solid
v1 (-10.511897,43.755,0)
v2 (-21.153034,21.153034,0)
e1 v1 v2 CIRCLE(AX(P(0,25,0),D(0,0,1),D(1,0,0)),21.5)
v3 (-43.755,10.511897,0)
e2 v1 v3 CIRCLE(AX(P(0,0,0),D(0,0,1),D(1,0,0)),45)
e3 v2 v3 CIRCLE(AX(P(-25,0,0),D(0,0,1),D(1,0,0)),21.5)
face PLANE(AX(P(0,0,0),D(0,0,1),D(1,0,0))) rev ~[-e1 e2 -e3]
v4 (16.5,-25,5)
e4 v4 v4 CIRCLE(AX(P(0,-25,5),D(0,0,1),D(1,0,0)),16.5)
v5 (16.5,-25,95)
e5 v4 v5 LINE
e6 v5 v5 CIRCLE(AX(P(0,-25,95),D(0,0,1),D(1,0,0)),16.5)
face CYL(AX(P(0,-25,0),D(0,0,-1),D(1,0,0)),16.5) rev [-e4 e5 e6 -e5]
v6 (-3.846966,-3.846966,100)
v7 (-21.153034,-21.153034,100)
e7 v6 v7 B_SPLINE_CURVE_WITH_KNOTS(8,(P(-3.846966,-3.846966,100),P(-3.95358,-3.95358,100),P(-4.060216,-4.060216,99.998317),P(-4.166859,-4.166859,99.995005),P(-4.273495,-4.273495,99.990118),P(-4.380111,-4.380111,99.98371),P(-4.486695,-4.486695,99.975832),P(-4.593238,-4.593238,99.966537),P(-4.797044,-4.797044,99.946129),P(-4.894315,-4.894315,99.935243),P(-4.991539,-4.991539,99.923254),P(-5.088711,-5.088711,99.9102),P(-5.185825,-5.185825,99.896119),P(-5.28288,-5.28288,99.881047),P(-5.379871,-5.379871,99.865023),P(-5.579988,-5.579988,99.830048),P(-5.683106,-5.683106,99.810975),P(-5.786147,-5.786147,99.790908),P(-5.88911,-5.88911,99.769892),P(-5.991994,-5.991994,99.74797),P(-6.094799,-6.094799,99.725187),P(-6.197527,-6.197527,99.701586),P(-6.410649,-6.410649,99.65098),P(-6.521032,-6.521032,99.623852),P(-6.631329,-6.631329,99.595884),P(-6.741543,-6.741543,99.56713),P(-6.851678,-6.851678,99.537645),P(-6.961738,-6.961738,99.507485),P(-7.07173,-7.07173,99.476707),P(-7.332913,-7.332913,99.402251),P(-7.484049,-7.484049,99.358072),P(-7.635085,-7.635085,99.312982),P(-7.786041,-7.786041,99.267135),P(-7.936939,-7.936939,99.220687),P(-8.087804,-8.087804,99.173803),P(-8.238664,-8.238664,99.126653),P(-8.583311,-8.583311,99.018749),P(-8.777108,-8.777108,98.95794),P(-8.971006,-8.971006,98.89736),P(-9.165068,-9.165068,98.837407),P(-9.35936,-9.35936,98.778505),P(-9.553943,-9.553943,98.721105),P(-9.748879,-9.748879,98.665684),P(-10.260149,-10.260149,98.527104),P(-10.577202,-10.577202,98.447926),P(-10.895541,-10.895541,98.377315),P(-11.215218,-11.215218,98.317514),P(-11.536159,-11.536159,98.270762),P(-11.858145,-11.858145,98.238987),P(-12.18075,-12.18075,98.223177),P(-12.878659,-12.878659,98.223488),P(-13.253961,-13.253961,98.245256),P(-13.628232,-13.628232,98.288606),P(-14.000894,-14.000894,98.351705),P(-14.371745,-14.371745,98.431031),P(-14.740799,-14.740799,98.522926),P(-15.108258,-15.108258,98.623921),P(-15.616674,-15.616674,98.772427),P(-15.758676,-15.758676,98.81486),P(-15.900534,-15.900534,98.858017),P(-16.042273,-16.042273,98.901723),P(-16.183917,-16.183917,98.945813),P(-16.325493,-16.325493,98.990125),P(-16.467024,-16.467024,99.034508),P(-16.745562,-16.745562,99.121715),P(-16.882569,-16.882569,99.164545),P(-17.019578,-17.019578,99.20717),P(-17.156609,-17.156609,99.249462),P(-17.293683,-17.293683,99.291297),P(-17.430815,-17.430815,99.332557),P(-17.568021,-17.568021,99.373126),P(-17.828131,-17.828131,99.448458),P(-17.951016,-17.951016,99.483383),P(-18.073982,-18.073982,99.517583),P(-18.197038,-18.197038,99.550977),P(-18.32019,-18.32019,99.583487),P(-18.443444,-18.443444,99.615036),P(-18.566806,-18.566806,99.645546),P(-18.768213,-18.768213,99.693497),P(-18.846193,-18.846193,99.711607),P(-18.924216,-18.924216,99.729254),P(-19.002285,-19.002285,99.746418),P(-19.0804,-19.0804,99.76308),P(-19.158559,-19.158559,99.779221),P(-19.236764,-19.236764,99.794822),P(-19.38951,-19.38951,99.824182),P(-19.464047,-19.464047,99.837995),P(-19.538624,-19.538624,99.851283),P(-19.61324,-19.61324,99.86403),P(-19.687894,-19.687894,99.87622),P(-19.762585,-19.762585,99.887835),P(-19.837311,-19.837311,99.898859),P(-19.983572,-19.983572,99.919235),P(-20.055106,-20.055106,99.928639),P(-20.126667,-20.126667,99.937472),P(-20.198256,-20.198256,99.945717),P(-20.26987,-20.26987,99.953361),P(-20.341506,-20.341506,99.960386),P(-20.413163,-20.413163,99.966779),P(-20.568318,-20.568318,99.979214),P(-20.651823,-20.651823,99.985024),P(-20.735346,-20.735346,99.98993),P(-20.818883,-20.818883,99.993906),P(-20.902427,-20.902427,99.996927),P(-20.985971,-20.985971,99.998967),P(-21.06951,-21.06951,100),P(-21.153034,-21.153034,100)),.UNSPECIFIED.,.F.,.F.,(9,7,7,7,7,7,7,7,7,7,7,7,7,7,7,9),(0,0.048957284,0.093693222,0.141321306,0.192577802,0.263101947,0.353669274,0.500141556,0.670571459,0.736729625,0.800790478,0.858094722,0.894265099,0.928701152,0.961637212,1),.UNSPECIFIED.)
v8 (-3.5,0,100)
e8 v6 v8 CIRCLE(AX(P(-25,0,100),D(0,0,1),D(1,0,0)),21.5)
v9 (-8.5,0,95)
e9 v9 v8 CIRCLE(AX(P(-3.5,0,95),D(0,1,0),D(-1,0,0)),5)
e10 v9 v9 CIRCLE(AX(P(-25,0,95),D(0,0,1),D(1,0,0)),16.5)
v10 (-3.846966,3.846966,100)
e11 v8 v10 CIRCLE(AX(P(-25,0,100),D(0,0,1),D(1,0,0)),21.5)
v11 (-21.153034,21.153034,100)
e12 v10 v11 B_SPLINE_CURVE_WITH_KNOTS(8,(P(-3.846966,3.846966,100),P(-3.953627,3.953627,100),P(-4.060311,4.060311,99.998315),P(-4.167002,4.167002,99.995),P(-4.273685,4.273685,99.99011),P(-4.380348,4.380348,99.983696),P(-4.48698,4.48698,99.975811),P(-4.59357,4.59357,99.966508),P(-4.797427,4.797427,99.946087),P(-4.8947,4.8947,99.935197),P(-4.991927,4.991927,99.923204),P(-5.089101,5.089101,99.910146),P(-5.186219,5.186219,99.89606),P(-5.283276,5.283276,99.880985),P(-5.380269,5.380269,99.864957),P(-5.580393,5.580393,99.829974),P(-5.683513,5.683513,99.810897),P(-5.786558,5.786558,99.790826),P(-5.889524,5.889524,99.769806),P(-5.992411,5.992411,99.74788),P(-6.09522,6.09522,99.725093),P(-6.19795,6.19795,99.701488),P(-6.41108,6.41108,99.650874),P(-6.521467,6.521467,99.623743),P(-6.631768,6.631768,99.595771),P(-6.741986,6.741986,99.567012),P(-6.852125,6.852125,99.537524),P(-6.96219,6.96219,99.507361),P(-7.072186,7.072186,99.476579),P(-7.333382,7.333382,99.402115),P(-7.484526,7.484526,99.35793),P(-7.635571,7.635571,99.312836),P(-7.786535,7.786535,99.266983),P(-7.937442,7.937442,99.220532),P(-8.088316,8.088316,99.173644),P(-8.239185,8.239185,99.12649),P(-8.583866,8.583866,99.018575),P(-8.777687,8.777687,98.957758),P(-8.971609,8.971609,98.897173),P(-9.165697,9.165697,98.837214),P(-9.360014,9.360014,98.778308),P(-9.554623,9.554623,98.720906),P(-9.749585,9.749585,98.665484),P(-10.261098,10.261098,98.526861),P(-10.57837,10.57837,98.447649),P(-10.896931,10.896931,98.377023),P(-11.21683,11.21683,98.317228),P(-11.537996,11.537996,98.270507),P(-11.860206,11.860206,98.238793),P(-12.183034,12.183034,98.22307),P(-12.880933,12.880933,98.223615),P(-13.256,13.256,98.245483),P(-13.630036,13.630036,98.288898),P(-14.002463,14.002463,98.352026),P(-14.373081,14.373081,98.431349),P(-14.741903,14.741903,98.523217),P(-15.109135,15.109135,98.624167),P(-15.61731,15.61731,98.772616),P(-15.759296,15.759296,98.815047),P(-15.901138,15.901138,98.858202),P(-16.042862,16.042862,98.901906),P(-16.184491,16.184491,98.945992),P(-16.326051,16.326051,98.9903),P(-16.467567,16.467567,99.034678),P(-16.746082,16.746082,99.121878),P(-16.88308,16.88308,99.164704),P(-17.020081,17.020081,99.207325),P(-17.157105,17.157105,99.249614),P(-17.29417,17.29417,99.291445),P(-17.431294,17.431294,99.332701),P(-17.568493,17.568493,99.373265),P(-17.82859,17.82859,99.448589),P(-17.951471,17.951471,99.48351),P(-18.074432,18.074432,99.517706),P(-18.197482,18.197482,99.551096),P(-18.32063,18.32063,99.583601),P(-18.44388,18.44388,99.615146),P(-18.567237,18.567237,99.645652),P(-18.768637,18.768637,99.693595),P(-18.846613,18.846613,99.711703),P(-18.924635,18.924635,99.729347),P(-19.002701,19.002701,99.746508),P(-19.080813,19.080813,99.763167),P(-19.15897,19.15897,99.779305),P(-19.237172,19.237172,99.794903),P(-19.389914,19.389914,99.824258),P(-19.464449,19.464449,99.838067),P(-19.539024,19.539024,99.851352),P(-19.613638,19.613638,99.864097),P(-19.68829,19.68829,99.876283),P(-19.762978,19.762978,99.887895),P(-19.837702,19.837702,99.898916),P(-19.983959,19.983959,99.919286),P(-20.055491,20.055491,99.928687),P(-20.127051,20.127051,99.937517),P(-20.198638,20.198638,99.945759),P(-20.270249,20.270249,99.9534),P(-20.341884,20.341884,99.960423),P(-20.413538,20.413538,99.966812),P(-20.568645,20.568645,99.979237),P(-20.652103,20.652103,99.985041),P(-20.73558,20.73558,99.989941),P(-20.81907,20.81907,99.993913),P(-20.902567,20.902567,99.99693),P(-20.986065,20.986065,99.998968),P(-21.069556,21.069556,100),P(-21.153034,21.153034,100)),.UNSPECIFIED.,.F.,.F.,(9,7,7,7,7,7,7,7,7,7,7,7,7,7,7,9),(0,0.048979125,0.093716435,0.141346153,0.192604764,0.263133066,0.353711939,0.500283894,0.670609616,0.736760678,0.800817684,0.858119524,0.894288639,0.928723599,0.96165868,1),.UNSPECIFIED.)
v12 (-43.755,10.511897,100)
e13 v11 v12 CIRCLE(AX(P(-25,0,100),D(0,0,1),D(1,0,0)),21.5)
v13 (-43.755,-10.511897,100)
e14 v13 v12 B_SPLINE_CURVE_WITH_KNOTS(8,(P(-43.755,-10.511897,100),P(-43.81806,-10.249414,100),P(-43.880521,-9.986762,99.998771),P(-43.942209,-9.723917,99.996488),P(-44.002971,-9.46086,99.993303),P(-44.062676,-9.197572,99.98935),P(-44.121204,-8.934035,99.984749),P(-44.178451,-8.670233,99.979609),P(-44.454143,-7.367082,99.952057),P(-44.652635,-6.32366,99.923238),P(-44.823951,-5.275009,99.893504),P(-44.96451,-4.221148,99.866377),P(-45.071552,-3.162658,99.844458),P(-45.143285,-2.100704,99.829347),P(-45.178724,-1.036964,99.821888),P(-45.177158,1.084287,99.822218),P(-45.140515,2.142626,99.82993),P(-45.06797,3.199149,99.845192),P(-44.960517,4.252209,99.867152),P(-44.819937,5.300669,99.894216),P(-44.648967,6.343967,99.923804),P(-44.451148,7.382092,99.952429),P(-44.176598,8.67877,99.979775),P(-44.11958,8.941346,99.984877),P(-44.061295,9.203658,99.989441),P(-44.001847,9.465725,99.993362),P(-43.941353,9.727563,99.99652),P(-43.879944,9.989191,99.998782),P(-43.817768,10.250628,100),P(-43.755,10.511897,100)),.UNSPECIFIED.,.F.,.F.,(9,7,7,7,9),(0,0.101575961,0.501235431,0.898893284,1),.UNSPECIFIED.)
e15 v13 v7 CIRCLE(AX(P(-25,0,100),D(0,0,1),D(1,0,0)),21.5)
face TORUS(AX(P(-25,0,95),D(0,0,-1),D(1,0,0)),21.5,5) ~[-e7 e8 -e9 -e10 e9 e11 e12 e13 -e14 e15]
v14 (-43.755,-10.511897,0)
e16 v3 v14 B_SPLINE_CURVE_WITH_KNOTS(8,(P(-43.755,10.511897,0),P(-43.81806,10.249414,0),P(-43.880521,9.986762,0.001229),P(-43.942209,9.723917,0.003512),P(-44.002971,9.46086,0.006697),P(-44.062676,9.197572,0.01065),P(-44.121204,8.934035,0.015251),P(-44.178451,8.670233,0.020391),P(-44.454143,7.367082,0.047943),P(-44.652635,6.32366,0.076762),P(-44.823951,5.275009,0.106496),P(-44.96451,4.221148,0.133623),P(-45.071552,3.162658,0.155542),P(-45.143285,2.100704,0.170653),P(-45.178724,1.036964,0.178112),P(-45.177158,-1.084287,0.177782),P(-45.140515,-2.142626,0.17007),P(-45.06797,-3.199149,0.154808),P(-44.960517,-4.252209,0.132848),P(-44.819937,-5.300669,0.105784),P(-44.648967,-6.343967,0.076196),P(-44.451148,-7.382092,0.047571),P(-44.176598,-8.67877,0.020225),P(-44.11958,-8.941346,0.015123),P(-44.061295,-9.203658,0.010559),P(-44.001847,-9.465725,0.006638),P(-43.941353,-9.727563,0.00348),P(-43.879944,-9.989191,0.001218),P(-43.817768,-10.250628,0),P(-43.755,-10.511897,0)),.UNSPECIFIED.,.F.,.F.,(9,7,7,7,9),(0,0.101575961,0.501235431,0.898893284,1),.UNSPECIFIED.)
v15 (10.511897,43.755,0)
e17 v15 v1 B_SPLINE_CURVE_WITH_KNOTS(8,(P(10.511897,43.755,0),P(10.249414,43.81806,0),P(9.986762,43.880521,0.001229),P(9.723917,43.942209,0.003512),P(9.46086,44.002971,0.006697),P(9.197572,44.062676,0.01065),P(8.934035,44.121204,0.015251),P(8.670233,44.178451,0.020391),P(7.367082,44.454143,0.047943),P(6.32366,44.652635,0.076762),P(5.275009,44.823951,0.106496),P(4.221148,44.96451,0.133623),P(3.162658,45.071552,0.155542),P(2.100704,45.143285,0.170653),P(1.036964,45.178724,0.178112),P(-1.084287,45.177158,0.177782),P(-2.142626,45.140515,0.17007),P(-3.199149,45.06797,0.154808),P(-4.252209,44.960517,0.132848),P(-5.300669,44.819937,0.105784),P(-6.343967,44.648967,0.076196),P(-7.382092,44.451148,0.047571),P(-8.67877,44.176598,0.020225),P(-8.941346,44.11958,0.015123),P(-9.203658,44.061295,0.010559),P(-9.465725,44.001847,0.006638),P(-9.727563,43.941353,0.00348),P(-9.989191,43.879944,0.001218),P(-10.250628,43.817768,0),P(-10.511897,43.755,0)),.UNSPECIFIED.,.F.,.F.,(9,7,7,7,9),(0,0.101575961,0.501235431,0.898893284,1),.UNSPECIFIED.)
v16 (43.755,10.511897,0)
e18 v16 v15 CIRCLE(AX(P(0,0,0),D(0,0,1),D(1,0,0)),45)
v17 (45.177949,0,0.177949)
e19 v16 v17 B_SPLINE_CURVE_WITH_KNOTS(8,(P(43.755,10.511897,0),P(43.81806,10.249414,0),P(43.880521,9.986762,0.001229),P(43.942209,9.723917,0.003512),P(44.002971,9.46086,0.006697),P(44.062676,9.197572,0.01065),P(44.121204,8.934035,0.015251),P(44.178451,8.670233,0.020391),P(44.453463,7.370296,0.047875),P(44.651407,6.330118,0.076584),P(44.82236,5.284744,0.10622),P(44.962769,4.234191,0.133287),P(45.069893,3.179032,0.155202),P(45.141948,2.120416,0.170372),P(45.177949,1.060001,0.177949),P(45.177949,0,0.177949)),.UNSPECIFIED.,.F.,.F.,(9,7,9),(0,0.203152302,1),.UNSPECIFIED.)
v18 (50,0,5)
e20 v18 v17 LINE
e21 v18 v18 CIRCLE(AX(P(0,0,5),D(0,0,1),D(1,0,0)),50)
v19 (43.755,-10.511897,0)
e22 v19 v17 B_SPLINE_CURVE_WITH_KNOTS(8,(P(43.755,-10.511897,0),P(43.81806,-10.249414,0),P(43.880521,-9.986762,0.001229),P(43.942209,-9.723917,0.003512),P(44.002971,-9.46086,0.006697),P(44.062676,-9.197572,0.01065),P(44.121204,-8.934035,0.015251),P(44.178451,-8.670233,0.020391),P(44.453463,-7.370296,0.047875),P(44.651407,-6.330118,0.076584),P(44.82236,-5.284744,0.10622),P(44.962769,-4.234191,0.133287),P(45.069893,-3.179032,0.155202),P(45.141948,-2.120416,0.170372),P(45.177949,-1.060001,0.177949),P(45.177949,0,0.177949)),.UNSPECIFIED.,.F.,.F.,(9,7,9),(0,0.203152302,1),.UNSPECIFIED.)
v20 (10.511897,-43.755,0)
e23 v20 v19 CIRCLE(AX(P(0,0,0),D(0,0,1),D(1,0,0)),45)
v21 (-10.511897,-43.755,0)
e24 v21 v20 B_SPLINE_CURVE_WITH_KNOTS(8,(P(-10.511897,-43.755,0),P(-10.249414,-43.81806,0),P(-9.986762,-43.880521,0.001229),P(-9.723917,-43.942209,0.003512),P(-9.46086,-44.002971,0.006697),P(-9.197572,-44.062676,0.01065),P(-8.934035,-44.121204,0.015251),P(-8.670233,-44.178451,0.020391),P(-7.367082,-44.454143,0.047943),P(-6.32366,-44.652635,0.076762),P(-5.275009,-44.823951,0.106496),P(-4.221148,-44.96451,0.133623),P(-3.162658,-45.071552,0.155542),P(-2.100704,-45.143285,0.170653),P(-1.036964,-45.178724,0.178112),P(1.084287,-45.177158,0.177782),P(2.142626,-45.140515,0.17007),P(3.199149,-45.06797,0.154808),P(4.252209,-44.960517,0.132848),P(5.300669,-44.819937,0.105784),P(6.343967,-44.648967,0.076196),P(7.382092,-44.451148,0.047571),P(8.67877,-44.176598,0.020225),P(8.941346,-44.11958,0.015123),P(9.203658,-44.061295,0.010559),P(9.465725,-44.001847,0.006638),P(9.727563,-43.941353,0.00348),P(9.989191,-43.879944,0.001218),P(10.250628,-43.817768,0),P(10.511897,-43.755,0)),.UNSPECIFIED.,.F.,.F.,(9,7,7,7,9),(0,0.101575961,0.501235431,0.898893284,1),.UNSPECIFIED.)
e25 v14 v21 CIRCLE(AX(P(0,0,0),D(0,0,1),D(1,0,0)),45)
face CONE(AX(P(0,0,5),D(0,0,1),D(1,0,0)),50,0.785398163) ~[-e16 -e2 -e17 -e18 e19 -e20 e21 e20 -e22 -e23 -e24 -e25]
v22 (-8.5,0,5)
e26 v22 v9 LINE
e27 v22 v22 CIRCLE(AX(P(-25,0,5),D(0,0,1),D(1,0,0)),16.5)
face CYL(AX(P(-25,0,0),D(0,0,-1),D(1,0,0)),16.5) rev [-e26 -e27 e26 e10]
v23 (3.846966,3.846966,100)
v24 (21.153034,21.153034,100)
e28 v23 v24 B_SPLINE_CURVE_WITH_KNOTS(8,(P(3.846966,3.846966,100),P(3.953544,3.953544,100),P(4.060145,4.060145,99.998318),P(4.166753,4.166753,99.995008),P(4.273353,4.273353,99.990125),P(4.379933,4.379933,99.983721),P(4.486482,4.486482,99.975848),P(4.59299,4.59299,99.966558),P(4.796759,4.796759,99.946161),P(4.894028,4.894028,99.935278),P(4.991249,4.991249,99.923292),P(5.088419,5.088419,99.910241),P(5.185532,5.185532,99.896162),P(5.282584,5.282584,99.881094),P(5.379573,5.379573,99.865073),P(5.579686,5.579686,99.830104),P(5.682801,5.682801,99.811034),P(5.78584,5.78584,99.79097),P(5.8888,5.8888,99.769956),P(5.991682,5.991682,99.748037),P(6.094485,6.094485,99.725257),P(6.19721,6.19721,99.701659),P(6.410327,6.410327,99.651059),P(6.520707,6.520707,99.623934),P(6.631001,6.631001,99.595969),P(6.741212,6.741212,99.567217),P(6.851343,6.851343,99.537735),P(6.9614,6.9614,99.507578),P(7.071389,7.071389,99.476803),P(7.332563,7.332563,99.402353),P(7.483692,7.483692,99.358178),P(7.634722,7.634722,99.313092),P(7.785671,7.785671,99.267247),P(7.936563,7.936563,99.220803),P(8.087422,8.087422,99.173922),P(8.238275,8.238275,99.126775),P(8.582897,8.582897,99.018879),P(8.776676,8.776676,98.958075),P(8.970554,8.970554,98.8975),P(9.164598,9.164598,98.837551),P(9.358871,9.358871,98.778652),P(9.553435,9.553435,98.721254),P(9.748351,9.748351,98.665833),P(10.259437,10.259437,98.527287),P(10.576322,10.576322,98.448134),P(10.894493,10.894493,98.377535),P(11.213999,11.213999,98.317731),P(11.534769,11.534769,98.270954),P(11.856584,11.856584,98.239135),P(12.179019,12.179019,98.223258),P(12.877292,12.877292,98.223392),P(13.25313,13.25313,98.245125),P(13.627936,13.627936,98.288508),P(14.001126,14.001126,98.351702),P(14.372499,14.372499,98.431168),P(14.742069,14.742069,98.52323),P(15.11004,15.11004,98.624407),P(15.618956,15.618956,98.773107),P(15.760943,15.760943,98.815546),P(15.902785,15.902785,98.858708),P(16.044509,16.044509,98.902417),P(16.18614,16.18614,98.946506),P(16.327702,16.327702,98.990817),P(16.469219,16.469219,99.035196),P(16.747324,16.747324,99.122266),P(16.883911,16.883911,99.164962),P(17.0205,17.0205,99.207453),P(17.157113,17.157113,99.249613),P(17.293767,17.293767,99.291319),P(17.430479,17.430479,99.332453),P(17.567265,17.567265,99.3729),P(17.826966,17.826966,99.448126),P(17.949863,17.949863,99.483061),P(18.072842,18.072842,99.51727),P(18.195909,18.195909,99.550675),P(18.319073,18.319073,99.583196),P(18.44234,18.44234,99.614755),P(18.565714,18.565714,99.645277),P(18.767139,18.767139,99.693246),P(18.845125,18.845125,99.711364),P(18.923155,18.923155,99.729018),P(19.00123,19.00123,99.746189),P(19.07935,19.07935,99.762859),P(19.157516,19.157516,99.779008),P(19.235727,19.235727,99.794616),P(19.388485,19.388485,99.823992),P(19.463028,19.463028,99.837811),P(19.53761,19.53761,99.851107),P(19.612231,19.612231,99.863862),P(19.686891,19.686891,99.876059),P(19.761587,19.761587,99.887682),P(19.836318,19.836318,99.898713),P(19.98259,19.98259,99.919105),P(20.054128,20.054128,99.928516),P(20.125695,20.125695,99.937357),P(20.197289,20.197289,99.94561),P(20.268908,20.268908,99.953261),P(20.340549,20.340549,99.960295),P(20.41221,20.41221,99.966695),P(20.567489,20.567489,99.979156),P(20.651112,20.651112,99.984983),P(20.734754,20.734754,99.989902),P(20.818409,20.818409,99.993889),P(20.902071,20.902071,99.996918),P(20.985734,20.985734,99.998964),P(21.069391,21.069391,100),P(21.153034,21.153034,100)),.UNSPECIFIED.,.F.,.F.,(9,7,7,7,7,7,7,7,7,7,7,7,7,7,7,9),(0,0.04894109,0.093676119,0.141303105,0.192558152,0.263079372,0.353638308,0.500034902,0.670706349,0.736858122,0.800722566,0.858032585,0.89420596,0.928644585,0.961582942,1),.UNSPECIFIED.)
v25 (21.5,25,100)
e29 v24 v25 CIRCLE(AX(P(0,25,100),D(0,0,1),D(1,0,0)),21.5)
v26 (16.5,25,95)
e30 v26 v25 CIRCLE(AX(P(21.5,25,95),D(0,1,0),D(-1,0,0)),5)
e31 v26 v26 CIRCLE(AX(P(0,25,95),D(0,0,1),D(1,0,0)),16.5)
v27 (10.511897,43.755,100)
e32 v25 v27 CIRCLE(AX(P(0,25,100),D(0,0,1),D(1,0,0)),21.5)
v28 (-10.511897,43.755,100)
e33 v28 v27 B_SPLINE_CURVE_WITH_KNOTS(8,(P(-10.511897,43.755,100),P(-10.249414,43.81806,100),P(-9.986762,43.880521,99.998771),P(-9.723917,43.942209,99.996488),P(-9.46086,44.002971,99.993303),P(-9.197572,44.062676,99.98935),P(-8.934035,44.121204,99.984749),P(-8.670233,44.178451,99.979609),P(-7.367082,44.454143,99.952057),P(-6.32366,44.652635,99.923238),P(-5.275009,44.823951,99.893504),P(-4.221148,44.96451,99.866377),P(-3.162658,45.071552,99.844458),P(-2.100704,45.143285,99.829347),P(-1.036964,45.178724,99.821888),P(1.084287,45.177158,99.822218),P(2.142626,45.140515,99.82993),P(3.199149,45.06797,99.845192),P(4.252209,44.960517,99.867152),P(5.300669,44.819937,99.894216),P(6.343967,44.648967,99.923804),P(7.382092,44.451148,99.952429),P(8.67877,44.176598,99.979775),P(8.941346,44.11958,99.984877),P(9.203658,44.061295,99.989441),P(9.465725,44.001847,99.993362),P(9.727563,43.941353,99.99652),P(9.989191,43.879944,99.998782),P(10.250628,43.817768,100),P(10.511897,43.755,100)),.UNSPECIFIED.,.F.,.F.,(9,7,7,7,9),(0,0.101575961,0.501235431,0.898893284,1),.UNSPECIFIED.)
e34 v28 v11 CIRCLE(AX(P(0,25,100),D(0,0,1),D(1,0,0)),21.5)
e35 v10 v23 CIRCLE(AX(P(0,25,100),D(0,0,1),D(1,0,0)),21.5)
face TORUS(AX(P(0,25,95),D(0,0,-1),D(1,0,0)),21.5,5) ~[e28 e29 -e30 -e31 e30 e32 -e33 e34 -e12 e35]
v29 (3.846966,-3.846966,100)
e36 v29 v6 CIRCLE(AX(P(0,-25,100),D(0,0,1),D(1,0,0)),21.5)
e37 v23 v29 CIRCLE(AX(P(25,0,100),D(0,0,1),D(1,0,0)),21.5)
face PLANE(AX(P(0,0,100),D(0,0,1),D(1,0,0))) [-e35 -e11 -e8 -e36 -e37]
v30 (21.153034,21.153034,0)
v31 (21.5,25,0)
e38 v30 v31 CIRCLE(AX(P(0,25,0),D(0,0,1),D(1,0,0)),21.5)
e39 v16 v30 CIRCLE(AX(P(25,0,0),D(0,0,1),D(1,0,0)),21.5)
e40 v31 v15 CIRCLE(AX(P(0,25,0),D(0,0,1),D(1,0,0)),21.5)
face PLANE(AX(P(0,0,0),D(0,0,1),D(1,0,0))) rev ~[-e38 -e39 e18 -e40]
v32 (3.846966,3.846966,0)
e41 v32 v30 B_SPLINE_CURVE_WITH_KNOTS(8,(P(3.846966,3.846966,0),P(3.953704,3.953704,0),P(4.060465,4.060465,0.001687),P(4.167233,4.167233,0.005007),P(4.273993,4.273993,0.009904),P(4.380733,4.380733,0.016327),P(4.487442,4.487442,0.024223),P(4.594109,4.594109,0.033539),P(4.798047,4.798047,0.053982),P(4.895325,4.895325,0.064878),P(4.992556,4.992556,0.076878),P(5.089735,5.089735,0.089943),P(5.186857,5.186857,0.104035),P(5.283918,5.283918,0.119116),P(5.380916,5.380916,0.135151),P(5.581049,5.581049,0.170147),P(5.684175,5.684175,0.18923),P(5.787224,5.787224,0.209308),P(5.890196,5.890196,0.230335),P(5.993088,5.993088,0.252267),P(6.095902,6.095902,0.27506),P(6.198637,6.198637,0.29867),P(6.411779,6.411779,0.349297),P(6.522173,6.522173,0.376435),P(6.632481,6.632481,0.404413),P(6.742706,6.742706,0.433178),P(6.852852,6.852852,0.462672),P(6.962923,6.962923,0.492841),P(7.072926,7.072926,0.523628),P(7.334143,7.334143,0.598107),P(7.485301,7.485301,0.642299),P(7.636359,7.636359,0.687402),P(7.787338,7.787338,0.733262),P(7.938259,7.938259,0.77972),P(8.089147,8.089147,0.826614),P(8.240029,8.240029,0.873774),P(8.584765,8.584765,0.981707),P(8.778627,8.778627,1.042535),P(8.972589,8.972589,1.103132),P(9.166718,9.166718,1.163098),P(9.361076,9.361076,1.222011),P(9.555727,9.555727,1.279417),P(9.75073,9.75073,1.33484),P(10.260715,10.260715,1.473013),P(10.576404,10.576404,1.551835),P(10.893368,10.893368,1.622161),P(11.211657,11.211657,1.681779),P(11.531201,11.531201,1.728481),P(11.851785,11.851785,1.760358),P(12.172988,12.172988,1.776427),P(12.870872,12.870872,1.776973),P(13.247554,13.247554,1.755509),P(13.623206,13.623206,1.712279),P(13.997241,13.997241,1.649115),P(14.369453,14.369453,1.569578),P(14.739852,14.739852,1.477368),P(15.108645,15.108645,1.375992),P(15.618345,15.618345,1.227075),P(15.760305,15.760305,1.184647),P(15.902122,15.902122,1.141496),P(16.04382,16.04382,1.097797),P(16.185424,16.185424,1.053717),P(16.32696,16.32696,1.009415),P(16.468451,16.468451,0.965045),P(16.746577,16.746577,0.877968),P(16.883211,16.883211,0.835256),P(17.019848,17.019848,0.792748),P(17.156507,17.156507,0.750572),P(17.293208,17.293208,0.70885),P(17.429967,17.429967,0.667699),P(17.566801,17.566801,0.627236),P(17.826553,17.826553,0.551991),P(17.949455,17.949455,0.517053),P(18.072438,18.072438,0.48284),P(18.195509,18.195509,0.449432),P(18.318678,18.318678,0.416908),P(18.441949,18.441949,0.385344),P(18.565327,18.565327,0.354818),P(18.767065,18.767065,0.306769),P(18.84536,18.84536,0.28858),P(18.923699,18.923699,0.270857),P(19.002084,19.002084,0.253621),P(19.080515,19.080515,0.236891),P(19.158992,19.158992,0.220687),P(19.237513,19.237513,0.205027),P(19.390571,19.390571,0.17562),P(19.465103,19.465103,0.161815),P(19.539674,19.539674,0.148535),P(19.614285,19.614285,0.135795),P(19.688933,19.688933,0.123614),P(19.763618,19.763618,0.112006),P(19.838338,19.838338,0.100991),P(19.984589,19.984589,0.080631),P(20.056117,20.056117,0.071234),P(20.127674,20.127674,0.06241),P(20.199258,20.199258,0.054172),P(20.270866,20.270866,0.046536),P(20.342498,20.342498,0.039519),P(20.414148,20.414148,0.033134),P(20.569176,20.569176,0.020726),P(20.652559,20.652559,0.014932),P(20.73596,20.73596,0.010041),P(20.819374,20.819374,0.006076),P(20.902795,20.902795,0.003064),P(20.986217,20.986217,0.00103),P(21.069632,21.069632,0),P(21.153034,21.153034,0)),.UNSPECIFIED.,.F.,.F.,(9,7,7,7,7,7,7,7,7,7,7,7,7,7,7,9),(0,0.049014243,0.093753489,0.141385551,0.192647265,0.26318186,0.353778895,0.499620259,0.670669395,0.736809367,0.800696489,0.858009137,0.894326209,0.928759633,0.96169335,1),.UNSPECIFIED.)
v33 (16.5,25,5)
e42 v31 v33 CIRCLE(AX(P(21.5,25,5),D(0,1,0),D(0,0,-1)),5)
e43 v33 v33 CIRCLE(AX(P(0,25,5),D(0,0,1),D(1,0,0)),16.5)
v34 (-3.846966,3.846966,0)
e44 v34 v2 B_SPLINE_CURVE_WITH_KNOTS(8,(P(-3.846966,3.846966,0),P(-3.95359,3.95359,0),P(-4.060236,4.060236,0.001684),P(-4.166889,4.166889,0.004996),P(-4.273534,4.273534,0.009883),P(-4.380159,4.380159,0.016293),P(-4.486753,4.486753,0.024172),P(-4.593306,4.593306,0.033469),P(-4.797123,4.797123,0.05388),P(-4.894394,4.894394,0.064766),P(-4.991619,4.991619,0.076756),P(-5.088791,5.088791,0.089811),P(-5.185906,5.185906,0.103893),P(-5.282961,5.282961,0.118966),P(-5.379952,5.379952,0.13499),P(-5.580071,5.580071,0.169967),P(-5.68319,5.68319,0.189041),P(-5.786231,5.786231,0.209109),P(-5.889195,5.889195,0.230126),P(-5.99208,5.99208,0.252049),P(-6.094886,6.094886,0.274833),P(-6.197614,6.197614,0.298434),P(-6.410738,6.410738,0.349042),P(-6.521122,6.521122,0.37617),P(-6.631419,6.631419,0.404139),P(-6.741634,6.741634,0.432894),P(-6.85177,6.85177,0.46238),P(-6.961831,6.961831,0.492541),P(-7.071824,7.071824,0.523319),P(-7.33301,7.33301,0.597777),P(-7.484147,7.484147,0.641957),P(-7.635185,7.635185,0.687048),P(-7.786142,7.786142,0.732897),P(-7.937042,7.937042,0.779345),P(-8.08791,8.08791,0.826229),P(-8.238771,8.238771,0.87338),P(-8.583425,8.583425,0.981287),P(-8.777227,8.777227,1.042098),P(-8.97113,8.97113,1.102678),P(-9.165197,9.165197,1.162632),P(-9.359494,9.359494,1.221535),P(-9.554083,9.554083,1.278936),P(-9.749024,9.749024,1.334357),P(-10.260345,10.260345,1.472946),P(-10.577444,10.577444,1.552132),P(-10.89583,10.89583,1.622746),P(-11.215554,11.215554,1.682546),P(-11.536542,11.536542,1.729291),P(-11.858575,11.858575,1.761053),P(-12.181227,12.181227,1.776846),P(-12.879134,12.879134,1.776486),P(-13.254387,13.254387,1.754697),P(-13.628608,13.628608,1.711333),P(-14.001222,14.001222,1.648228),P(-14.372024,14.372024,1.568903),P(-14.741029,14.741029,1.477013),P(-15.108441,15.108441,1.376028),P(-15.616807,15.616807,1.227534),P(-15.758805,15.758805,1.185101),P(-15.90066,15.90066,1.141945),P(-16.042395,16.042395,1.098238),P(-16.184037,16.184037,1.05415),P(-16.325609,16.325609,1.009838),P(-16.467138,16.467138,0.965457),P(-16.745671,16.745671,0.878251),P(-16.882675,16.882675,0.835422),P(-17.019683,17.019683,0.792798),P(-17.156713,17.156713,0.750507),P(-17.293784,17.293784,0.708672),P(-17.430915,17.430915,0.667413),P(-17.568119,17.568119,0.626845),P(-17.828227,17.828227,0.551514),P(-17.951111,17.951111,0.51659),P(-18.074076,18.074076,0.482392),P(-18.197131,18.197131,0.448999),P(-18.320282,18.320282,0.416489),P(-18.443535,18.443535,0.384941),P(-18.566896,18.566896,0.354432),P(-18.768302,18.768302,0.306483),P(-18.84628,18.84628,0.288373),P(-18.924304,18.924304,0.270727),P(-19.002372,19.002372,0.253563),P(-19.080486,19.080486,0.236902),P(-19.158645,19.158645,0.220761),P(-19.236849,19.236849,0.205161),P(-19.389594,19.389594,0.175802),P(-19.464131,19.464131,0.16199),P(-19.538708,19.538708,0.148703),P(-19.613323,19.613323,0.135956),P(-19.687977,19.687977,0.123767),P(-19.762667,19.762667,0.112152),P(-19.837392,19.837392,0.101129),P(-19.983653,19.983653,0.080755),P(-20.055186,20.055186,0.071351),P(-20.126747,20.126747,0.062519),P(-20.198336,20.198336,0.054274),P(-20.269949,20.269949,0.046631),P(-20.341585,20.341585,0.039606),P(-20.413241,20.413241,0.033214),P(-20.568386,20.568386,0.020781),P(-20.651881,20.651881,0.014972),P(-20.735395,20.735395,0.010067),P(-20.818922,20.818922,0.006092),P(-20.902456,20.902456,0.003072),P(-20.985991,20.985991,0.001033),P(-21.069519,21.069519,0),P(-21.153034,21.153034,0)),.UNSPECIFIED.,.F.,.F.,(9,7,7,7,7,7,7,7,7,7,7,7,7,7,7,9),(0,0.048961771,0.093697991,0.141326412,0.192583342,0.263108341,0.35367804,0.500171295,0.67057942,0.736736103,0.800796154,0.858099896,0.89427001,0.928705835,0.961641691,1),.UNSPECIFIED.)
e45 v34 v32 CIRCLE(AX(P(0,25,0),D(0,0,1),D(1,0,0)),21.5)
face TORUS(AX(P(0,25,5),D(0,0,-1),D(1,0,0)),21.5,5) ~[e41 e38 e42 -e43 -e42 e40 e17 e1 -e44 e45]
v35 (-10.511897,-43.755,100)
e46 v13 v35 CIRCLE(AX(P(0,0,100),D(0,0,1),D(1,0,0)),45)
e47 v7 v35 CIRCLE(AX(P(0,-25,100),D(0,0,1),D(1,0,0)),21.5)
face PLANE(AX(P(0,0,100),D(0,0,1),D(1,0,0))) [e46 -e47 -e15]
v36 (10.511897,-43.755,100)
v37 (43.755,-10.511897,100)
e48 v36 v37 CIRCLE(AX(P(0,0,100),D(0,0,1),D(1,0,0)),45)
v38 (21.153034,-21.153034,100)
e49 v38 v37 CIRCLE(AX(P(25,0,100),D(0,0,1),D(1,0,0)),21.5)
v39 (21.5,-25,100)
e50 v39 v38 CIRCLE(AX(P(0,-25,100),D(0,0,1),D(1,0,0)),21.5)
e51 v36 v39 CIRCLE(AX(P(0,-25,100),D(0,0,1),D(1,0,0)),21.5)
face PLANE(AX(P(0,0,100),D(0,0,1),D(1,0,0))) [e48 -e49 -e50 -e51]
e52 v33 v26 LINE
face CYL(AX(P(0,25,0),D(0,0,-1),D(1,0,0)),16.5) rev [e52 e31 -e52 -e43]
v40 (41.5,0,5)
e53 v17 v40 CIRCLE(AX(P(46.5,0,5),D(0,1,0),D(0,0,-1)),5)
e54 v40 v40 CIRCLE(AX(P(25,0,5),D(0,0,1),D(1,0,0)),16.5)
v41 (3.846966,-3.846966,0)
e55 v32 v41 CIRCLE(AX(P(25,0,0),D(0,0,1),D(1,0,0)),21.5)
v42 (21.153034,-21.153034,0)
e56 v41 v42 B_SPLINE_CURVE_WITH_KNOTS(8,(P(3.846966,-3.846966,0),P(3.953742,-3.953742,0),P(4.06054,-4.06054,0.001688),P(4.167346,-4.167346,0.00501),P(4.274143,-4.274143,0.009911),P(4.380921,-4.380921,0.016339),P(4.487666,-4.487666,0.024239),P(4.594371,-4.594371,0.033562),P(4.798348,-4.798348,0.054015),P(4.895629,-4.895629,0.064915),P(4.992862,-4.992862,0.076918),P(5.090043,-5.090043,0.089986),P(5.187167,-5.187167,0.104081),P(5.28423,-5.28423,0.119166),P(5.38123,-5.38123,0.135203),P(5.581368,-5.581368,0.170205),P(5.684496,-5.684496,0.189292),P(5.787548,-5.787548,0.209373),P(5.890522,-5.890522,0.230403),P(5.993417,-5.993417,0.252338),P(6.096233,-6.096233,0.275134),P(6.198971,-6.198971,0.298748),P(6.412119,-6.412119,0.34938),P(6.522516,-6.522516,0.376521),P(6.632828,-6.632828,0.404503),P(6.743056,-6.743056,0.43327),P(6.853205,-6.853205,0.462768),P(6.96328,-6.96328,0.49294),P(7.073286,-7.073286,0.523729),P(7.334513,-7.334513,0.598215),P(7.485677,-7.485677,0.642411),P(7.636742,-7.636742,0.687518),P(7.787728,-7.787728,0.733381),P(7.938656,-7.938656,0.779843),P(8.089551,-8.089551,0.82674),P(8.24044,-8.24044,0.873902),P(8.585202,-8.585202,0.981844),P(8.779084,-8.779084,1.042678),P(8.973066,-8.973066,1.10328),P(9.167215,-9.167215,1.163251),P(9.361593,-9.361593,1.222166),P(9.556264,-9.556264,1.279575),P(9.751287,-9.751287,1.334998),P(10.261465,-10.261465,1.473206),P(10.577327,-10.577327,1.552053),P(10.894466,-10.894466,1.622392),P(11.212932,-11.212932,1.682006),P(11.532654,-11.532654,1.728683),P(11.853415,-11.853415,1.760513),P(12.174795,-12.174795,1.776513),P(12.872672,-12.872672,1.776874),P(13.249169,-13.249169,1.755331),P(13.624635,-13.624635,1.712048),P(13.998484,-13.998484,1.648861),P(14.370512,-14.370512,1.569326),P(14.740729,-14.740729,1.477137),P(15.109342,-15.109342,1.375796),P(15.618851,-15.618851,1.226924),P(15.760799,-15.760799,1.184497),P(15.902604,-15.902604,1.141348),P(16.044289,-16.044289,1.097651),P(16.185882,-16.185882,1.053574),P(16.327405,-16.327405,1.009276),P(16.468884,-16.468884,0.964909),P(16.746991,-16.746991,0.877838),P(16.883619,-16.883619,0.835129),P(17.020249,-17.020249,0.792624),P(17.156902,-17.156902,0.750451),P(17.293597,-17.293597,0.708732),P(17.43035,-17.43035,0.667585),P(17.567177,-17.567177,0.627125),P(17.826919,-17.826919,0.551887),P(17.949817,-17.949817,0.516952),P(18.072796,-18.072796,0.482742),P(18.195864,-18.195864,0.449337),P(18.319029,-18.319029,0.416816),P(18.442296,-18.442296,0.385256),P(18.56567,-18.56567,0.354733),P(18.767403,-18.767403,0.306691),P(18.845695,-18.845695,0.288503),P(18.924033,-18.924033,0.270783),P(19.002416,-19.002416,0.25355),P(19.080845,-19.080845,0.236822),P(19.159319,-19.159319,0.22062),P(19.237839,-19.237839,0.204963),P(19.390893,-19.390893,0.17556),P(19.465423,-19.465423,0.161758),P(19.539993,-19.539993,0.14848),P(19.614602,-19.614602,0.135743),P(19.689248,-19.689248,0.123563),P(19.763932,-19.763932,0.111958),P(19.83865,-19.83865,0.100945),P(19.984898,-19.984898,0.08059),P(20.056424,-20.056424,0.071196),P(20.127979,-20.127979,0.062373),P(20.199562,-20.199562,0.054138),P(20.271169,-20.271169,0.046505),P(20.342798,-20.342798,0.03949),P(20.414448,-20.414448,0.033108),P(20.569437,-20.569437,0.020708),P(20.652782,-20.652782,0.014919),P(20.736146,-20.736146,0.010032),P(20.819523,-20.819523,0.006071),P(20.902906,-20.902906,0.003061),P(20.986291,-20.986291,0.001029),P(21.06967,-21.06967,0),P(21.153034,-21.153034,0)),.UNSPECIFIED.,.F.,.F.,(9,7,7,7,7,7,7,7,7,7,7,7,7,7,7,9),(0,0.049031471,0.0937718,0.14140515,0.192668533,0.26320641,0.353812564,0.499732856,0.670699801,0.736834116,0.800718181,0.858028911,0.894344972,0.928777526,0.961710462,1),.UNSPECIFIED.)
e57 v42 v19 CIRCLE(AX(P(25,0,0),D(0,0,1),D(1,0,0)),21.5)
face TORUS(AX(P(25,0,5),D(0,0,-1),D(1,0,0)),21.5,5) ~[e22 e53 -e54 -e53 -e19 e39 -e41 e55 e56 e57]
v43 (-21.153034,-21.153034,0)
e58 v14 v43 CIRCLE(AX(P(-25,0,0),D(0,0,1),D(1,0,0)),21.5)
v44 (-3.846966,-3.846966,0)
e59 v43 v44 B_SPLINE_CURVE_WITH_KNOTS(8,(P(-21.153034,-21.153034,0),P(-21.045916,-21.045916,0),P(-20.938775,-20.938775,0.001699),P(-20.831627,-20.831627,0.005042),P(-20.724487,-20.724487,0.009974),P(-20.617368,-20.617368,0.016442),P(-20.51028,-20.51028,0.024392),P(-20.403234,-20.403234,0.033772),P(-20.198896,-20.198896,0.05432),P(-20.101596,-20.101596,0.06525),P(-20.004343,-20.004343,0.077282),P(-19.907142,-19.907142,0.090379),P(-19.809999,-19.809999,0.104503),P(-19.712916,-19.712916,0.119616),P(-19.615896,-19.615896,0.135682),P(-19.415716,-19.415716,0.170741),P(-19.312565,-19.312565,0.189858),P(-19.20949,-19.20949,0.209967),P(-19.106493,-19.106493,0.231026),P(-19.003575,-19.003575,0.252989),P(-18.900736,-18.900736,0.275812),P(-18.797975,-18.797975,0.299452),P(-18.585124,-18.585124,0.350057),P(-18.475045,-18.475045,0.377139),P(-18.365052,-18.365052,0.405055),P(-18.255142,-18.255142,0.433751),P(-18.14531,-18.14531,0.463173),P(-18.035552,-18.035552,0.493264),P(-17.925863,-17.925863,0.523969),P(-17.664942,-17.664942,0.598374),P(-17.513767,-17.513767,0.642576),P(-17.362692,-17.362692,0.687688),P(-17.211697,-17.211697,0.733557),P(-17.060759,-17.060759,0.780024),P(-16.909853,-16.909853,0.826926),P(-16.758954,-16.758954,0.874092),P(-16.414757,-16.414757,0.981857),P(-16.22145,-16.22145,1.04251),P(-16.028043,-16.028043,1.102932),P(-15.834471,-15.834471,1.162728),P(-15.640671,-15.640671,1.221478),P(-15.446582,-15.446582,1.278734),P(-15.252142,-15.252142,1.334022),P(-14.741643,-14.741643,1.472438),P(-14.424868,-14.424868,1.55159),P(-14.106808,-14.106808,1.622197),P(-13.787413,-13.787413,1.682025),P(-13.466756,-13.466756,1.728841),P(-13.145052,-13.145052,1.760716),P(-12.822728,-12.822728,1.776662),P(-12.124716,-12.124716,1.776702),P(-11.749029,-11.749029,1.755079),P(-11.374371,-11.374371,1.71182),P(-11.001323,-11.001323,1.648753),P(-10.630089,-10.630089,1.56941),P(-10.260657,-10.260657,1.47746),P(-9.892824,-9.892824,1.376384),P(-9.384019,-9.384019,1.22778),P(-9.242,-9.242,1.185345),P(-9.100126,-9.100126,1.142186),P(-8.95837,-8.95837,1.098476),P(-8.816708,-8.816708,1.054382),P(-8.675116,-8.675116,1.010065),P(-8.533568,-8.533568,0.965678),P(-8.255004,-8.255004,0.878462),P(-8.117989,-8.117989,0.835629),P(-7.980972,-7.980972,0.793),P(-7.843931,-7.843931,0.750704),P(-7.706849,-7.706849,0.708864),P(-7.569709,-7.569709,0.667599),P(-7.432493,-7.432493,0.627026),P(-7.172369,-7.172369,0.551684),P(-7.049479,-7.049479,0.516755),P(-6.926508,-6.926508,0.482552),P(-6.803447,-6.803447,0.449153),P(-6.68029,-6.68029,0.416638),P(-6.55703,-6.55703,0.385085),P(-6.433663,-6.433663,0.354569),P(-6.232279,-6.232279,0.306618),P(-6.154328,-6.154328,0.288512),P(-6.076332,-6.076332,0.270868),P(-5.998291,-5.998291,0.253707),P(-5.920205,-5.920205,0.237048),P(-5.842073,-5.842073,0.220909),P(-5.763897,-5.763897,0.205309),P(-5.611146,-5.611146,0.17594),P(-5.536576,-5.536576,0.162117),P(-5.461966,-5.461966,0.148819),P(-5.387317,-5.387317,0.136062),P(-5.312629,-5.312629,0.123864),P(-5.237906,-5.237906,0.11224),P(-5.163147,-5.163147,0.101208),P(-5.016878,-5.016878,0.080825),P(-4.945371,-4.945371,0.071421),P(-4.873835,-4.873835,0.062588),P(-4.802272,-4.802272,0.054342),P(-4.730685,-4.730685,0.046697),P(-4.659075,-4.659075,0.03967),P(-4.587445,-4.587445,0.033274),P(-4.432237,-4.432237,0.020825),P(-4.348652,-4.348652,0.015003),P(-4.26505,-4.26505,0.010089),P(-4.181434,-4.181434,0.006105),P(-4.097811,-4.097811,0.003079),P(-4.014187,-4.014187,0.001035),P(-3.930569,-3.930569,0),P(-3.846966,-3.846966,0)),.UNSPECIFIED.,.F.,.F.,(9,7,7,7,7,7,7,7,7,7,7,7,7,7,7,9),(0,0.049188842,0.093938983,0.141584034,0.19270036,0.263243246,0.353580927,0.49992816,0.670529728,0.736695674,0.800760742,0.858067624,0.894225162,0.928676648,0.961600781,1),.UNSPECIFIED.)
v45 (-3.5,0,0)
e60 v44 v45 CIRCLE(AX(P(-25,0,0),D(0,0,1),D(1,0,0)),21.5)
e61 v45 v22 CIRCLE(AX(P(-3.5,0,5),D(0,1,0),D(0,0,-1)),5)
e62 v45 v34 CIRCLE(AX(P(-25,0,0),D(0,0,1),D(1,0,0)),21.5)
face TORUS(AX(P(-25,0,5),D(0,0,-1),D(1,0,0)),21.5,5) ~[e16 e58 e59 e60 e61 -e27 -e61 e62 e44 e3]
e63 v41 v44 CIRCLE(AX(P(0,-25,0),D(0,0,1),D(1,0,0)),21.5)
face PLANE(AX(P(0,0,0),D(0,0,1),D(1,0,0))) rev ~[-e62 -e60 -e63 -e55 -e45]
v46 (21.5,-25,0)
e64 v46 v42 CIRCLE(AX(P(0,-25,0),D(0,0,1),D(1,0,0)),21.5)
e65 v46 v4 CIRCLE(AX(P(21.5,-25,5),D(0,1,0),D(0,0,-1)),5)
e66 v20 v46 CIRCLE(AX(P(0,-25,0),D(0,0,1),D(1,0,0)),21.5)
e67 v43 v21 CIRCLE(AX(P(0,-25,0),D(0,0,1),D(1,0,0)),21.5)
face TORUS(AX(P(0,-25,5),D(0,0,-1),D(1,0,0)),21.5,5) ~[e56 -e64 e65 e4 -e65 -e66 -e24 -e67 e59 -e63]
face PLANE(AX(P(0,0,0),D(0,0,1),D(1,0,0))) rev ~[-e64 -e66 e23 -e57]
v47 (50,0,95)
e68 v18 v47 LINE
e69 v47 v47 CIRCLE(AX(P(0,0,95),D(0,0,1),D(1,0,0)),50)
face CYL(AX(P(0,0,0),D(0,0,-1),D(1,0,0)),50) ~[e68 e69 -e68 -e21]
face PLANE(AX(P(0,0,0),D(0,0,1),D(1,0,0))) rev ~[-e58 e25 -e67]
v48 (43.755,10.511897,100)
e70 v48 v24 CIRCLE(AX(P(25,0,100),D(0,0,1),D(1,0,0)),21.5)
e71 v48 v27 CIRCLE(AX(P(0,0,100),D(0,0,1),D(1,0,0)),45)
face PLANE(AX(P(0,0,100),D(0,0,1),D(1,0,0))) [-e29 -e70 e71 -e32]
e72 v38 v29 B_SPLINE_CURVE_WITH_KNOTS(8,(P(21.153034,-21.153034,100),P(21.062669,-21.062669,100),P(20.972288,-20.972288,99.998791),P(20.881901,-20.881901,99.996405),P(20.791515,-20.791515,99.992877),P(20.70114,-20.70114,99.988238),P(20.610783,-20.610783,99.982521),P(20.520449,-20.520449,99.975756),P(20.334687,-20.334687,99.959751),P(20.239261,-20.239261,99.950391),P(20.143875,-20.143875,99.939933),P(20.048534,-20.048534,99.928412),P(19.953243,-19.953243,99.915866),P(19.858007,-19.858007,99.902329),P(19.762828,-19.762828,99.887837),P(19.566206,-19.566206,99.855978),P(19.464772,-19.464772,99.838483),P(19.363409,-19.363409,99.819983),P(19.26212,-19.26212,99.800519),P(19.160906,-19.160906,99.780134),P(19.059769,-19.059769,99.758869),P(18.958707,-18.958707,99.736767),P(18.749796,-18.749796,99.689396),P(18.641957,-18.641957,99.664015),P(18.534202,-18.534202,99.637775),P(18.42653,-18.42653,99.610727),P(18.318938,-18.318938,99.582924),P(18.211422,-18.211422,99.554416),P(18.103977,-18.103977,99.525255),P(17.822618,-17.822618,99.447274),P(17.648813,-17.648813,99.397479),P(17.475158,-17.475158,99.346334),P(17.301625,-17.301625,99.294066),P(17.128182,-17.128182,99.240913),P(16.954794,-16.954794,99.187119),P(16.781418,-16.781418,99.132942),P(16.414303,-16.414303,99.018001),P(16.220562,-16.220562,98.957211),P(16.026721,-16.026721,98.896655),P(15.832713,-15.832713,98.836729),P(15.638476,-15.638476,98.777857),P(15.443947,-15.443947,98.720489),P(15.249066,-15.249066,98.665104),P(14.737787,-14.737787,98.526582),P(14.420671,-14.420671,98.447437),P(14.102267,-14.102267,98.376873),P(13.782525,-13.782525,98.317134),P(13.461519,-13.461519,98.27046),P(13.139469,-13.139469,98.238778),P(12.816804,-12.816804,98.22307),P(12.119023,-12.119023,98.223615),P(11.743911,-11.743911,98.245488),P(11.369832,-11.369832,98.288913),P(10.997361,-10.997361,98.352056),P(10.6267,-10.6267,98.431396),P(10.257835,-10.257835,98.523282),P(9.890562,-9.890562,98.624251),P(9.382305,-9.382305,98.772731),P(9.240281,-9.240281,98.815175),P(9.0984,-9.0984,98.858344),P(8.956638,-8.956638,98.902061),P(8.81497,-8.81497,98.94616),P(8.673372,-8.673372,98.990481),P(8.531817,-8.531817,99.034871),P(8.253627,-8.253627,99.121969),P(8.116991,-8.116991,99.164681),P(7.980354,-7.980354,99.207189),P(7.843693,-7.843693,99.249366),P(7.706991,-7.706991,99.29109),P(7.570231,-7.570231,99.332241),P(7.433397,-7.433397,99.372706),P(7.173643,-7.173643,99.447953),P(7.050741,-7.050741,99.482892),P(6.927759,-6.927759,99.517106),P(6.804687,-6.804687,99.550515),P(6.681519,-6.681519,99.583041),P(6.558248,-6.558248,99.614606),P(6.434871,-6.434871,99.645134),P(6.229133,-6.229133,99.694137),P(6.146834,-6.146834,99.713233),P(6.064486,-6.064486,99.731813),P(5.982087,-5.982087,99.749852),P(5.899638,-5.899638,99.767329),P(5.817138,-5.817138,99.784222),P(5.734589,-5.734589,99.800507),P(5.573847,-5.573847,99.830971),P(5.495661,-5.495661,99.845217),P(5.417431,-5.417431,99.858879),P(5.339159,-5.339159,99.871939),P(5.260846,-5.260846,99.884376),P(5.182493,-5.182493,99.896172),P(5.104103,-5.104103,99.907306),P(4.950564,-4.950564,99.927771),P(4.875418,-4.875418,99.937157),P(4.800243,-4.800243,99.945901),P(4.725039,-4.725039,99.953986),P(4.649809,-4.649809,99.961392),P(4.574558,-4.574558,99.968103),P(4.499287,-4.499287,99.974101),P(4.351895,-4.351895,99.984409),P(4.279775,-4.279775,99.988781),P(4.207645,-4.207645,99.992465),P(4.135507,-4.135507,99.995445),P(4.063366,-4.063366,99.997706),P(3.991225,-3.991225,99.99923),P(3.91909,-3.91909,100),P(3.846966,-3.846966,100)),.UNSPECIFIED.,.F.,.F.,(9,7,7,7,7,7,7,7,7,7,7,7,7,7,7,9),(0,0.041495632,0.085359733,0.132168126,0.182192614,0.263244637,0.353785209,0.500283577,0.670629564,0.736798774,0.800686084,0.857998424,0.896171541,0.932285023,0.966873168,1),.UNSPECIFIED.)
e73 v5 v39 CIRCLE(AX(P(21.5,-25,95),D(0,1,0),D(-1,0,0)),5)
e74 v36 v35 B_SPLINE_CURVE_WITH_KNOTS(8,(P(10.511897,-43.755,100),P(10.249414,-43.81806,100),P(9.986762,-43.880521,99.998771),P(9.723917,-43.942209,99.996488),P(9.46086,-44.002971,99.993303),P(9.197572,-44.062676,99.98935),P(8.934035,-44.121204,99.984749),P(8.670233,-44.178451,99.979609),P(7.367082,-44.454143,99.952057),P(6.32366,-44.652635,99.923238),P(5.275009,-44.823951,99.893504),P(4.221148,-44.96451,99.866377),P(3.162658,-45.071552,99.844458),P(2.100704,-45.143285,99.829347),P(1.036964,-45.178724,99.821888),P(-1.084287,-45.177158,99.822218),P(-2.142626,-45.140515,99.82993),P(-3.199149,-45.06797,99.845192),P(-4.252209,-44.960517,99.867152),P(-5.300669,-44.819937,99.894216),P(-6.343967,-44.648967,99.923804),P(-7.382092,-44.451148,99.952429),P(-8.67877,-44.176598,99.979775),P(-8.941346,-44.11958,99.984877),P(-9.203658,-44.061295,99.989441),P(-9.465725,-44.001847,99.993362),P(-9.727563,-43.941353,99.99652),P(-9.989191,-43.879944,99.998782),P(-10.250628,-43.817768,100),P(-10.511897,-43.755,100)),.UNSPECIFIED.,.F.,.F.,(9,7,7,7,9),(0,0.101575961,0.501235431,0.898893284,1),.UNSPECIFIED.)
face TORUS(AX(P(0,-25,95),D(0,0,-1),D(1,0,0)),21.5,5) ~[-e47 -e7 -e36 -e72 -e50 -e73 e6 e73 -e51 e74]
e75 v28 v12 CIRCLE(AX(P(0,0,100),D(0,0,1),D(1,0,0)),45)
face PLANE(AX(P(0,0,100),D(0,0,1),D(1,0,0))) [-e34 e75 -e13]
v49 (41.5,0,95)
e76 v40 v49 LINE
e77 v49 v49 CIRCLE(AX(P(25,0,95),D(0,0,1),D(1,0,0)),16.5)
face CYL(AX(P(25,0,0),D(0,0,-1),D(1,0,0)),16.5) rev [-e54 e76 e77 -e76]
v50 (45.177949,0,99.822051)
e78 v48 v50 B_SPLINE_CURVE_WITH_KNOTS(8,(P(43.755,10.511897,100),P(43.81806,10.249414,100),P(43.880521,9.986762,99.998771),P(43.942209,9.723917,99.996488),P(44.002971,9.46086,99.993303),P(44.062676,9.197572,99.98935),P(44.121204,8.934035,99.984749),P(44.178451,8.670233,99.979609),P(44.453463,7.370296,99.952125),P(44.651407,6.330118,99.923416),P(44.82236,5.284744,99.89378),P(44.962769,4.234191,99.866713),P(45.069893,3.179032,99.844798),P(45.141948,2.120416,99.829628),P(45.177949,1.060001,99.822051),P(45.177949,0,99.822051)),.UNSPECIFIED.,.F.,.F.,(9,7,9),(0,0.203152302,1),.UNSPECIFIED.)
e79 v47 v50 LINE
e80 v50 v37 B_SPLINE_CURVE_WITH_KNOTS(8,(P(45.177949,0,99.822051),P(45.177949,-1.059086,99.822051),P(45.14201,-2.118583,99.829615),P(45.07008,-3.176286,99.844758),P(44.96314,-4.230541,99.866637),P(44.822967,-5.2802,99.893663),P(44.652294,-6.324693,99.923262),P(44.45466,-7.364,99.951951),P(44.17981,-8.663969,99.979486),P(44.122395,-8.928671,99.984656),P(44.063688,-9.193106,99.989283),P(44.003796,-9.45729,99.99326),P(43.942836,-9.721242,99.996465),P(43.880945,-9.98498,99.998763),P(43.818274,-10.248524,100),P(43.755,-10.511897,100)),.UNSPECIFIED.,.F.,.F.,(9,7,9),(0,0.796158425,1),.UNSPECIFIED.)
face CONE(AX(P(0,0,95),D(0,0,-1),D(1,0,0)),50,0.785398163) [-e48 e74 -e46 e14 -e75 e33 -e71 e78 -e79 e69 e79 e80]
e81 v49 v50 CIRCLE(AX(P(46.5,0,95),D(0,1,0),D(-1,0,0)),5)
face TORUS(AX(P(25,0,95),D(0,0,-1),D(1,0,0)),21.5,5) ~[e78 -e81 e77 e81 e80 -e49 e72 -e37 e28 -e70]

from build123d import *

# Parameters (mm, degrees)
F0_R     = 50
F0_R_2   = 16.5
F1_DEPTH = 100
F4_SIZE  = 5


# Not quite as in the source:
# - a fillet or chamfer that OpenCascade refuses, or shapes differently, is made with other operations: its cross-section is extruded or revolved along the edge and cut away or added


with BuildPart() as f1:
    # F0 (on Top) → F1 (new body)
    with BuildSketch(Plane.XY):
        Circle(F0_R)
        with Locations((0, -25)):
            Circle(F0_R_2, mode=Mode.SUBTRACT)
        with Locations((-25, 0)):
            Circle(F0_R_2, mode=Mode.SUBTRACT)
        with Locations((25, 0)):
            Circle(F0_R_2, mode=Mode.SUBTRACT)
        with Locations((0, 25)):
            Circle(F0_R_2, mode=Mode.SUBTRACT)
    extrude(amount=F1_DEPTH)

    # F2: fillet of radius 5 on 4 edges, made by hand

    # F2_s1 → F2_t2 (revolve, cut)
    with BuildSketch(Plane.XZ):
        with BuildLine():
            ThreePointArc((41.5, 95), (42.9644660941, 98.5355339059), (46.5, 100))
            Line((46.5, 100), (41.5, 100))
            Line((41.5, 100), (41.5, 95))
        make_face()
    revolve(axis=Axis((25, 0, 100), (0, 0, 1)), mode=Mode.SUBTRACT)

    # F2_s3 → F2_t4 (revolve, cut)
    with BuildSketch(Plane.XZ.offset(-25)):
        with BuildLine():
            ThreePointArc((16.5, 95), (17.9644660941, 98.5355339059), (21.5, 100))
            Line((21.5, 100), (16.5, 100))
            Line((16.5, 100), (16.5, 95))
        make_face()
    revolve(axis=Axis((0, 25, 100), (0, 0, 1)), mode=Mode.SUBTRACT)

    # F2_s5 → F2_t6 (revolve, cut)
    with BuildSketch(Plane.XZ):
        with BuildLine():
            ThreePointArc((-8.5, 95), (-7.0355339059, 98.5355339059), (-3.5, 100))
            Line((-3.5, 100), (-8.5, 100))
            Line((-8.5, 100), (-8.5, 95))
        make_face()
    revolve(axis=Axis((-25, 0, 100), (0, 0, 1)), mode=Mode.SUBTRACT)

    # F2_s7 → F2_t8 (revolve, cut)
    with BuildSketch(Plane.XZ.offset(25)):
        with BuildLine():
            ThreePointArc((16.5, 95), (17.9644660941, 98.5355339059), (21.5, 100))
            Line((21.5, 100), (16.5, 100))
            Line((16.5, 100), (16.5, 95))
        make_face()
    revolve(axis=Axis((0, -25, 100), (0, 0, 1)), mode=Mode.SUBTRACT)

    # F3: chamfer of 5 on 1 edges, made by hand

    # F3_s1 → F3_t2 (revolve, cut)
    with BuildSketch(Plane.XZ):
        Polygon((50, 95), (45, 100), (50, 100), align=None)
    revolve(axis=Axis((0, 0, 100), (0, 0, 1)), mode=Mode.SUBTRACT)

    # F4
    f4_edges = [f1.edges().sort_by_distance(p)[0] for p in [
        (-50, 0, 0),
    ]]
    chamfer(f4_edges, length=F4_SIZE)

    # F5: fillet of radius 5 on 4 edges, made by hand

    # F5_s1 → F5_t2 (revolve, cut)
    with BuildSketch(Plane.XZ):
        with BuildLine():
            ThreePointArc((-3.5, 0), (-7.0355339059, 1.4644660941), (-8.5, 5))
            Line((-8.5, 5), (-8.5, 0))
            Line((-8.5, 0), (-3.5, 0))
        make_face()
    revolve(axis=Axis((-25, 0, 0), (0, 0, 1)), mode=Mode.SUBTRACT)

    # F5_s3 → F5_t4 (revolve, cut)
    with BuildSketch(Plane.XZ.offset(-25)):
        with BuildLine():
            ThreePointArc((21.5, 0), (17.9644660941, 1.4644660941), (16.5, 5))
            Line((16.5, 5), (16.5, 0))
            Line((16.5, 0), (21.5, 0))
        make_face()
    revolve(axis=Axis((0, 25, 0), (0, 0, 1)), mode=Mode.SUBTRACT)

    # F5_s5 → F5_t6 (revolve, cut)
    with BuildSketch(Plane.XZ):
        with BuildLine():
            ThreePointArc((46.5, 0), (42.9644660941, 1.4644660941), (41.5, 5))
            Line((41.5, 5), (41.5, 0))
            Line((41.5, 0), (46.5, 0))
        make_face()
    revolve(axis=Axis((25, 0, 0), (0, 0, 1)), mode=Mode.SUBTRACT)

    # F5_s7 → F5_t8 (revolve, cut)
    with BuildSketch(Plane.XZ.offset(25)):
        with BuildLine():
            ThreePointArc((21.5, 0), (17.9644660941, 1.4644660941), (16.5, 5))
            Line((16.5, 5), (16.5, 0))
            Line((16.5, 0), (21.5, 0))
        make_face()
    revolve(axis=Axis((0, -25, 0), (0, 0, 1)), mode=Mode.SUBTRACT)


solid = f1.part
